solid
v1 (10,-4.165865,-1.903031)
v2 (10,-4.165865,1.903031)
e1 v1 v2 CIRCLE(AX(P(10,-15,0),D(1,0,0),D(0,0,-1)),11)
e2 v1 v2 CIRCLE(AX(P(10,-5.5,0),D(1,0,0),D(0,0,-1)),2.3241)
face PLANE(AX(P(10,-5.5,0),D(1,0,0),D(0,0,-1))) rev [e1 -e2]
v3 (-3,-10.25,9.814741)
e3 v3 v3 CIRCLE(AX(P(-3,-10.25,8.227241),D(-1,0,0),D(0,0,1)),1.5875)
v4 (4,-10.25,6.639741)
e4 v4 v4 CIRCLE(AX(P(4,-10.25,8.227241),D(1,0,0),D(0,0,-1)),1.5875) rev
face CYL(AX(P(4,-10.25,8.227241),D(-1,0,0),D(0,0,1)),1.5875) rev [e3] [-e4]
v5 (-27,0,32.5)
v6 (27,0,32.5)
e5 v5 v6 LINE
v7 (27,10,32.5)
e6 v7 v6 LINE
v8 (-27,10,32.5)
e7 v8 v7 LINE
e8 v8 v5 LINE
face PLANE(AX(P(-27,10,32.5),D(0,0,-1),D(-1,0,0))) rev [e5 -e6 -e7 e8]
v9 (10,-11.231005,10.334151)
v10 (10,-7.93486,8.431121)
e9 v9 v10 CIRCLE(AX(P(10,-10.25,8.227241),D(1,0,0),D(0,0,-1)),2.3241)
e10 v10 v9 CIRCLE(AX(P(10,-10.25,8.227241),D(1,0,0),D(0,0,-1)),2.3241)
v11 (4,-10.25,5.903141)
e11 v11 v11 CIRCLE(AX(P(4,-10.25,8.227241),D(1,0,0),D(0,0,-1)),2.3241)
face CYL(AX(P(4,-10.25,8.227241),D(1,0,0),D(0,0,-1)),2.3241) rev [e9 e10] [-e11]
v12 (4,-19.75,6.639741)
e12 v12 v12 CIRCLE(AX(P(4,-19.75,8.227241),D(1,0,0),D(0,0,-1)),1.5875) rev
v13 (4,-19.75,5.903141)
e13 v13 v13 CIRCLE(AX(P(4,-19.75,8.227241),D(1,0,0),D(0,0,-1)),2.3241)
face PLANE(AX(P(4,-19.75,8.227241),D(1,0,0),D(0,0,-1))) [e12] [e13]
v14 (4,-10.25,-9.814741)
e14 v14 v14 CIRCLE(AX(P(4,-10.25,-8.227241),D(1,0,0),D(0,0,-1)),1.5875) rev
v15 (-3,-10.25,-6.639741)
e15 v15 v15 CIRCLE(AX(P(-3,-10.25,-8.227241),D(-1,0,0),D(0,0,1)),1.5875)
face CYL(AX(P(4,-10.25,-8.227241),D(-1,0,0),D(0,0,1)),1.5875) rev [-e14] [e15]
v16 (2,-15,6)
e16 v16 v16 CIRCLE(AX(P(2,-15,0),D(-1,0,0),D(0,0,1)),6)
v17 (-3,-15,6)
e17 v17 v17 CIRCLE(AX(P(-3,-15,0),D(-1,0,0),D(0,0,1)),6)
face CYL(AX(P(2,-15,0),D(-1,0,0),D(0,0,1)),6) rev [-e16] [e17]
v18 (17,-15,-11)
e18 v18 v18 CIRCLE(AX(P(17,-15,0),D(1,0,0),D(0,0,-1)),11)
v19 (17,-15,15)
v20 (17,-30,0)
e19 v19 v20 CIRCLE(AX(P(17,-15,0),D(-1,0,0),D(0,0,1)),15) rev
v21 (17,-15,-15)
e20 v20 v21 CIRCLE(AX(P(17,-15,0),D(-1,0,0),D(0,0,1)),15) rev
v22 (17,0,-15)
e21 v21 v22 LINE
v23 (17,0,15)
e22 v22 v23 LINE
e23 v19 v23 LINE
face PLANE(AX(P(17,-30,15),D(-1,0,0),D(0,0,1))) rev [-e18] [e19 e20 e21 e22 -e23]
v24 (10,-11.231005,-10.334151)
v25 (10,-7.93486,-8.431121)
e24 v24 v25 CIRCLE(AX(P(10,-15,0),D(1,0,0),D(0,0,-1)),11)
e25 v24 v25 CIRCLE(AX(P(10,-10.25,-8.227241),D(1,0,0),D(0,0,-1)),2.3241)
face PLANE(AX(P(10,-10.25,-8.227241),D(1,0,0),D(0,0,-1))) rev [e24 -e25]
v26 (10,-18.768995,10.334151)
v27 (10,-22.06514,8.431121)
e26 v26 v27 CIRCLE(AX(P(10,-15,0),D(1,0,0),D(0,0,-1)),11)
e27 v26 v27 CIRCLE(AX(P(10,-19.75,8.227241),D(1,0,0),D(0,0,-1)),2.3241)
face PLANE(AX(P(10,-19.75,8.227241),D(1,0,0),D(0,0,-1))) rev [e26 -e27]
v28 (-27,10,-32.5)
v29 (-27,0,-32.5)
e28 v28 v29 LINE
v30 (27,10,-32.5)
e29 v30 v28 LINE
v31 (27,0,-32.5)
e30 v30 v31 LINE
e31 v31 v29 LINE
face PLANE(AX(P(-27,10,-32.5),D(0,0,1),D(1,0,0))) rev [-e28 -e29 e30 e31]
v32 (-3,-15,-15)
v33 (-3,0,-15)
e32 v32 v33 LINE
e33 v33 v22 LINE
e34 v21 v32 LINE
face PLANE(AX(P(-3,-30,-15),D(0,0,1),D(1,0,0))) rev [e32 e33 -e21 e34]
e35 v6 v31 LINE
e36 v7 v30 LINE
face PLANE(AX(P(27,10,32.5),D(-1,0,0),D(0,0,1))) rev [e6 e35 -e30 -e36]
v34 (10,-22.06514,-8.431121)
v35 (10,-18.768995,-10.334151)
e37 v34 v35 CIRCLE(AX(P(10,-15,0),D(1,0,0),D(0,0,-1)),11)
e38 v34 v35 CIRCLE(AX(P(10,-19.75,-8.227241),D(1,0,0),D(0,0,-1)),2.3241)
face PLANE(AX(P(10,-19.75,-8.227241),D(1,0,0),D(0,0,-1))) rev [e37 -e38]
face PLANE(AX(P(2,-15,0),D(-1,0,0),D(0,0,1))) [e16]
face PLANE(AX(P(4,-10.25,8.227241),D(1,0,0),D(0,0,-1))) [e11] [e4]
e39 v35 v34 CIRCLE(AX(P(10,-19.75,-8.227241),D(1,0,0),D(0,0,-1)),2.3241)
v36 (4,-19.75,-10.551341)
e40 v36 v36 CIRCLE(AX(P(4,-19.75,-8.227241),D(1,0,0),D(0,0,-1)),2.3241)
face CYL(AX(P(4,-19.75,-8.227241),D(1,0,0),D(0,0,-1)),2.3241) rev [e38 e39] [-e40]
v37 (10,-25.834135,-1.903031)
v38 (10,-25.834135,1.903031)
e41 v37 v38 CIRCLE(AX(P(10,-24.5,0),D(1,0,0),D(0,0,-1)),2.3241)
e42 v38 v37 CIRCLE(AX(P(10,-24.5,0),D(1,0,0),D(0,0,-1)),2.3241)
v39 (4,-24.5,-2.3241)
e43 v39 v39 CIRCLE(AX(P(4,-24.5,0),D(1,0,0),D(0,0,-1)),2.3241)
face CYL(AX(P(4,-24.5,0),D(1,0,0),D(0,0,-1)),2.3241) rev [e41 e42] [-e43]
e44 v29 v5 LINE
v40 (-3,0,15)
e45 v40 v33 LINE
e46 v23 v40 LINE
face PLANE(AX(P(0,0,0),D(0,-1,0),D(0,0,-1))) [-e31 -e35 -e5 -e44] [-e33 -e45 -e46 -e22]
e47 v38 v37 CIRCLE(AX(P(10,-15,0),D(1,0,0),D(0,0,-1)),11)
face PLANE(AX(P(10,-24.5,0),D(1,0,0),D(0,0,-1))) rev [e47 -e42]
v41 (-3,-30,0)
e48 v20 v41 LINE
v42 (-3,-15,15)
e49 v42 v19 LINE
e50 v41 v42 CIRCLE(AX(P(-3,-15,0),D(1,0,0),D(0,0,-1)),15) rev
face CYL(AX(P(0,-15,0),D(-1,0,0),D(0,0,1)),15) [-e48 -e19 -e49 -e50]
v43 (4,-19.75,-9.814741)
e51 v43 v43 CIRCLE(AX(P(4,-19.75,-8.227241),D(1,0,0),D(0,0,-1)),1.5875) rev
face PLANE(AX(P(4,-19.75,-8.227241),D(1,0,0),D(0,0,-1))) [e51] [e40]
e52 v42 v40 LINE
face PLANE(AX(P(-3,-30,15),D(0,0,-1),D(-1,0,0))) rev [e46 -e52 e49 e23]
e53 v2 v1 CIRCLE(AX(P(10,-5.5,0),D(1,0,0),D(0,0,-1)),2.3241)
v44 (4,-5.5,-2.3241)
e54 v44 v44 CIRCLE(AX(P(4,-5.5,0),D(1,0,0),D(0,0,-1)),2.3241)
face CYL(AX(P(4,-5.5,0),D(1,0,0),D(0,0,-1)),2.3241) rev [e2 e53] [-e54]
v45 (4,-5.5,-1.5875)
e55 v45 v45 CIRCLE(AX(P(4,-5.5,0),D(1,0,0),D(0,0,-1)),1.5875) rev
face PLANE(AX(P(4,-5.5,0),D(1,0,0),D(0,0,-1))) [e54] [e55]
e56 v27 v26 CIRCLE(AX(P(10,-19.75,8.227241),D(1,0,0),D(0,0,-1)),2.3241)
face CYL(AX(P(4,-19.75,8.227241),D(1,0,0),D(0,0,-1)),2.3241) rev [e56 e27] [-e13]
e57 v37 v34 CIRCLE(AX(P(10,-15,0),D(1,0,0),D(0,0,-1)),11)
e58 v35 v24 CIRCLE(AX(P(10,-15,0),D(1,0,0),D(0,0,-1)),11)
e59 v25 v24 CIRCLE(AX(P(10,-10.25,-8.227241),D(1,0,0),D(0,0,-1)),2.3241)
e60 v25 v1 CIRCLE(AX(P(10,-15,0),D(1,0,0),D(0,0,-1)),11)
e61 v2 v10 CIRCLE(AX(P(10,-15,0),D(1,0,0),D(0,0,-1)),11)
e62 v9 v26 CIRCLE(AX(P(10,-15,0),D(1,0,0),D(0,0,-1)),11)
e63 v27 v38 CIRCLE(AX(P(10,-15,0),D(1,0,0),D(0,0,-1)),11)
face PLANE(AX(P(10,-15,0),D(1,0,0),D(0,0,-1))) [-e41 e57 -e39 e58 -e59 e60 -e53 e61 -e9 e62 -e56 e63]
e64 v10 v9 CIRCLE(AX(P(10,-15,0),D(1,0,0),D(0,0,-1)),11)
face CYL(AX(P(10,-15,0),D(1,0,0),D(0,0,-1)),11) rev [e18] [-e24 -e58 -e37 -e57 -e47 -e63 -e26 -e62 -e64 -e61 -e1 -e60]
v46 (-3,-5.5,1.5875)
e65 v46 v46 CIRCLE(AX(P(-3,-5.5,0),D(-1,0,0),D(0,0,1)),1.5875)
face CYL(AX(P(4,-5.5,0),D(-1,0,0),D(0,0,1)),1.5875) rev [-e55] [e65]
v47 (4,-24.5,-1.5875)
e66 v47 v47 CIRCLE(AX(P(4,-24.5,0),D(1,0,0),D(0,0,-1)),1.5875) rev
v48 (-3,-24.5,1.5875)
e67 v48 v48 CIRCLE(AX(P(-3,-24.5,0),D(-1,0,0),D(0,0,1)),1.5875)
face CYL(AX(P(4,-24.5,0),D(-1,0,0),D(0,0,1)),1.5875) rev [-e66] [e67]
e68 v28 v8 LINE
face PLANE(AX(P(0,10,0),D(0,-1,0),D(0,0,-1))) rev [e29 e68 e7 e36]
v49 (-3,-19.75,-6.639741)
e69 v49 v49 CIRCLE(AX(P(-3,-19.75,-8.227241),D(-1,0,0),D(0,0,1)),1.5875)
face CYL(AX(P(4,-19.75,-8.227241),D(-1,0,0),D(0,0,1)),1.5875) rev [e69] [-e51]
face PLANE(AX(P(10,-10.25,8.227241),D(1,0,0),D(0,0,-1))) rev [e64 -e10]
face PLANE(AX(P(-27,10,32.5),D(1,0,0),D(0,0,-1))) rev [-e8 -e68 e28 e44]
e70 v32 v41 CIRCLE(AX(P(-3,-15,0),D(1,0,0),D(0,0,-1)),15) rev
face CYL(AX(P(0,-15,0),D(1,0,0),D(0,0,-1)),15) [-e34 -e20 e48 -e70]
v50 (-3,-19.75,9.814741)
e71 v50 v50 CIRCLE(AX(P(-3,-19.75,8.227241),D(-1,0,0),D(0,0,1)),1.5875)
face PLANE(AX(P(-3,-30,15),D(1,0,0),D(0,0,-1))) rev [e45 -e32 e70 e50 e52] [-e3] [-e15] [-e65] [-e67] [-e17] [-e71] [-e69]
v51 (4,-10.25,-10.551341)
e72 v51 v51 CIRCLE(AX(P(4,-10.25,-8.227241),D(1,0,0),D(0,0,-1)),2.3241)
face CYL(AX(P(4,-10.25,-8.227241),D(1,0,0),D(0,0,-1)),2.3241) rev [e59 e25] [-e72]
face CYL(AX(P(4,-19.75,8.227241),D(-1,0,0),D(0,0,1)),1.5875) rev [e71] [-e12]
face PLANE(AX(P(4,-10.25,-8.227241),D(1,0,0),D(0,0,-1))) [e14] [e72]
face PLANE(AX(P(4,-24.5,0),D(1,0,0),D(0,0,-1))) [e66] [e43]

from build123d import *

# Parameters (mm, degrees)
SKETCH1_W           = 54
SKETCH1_H           = 65
BOSS_EXTRUDE1_DEPTH = 10
SKETCH2_W           = 20
SKETCH2_H           = 30
BOSS_EXTRUDE2_DEPTH = 30
FILLET1_R           = 15
SKETCH3_R           = 11
CUT_EXTRUDE1_DEPTH  = 7
SKETCH4_R           = 6
CUT_EXTRUDE2_DEPTH  = 5
SKETCH5_R           = 1.5875
CUT_EXTRUDE3_DEPTH  = 7
SKETCH6_R           = 2.3241
CUT_EXTRUDE4_DEPTH  = 6


with BuildPart() as part:
    # Sketch1 → Boss-Extrude1 (new body)
    with BuildSketch(Plane(origin=(0, 0, 0), x_dir=(1, 0, 0), z_dir=(0, 1, 0))):
        Rectangle(SKETCH1_W, SKETCH1_H)
    extrude(amount=BOSS_EXTRUDE1_DEPTH)

    # Sketch2 → Boss-Extrude2 (add)
    with BuildSketch(Plane.XZ):
        with Locations((7, 0)):
            Rectangle(SKETCH2_W, SKETCH2_H)
    extrude(amount=BOSS_EXTRUDE2_DEPTH)

    # Fillet1
    fillet1_edges = [part.edges().sort_by_distance(p)[0] for p in [
        (7, -30, -15),
        (7, -30, 15),
    ]]
    fillet(fillet1_edges, radius=FILLET1_R - 0.0001)  # a hair under: the kernel refuses the full size

    # Sketch3 → Cut-Extrude1 (cut)
    with BuildSketch(Plane(origin=(17, 0, 0), x_dir=(0, 0, -1), z_dir=(1, 0, 0))):
        with Locations((0, -15)):
            Circle(SKETCH3_R)
    extrude(amount=-CUT_EXTRUDE1_DEPTH, mode=Mode.SUBTRACT)

    # Sketch4 → Cut-Extrude2 (cut)
    with BuildSketch(Plane.ZY.offset(3)):
        with Locations((0, -15)):
            Circle(SKETCH4_R)
    extrude(amount=-CUT_EXTRUDE2_DEPTH, mode=Mode.SUBTRACT)

    # Sketch5 → Cut-Extrude3 (cut)
    with BuildSketch(Plane.ZY.offset(3)):
        with Locations((0, -5.5)):
            Circle(SKETCH5_R)
        with Locations((8.227241336, -10.25)):
            Circle(SKETCH5_R)
        with Locations((8.227241336, -19.75)):
            Circle(SKETCH5_R)
        with Locations((0, -24.5)):
            Circle(SKETCH5_R)
        with Locations((-8.227241336, -19.75)):
            Circle(SKETCH5_R)
        with Locations((-8.227241336, -10.25)):
            Circle(SKETCH5_R)
    extrude(amount=-CUT_EXTRUDE3_DEPTH, mode=Mode.SUBTRACT)

    # Sketch6 → Cut-Extrude4 (cut)
    with BuildSketch(Plane(origin=(10, 0, 0), x_dir=(0, 0, -1), z_dir=(1, 0, 0))):
        with Locations((0, -5.5)):
            Circle(SKETCH6_R)
        with Locations((8.227241336, -10.25)):
            Circle(SKETCH6_R)
        with Locations((8.227241336, -19.75)):
            Circle(SKETCH6_R)
        with Locations((0, -24.5)):
            Circle(SKETCH6_R)
        with Locations((-8.227241336, -19.75)):
            Circle(SKETCH6_R)
        with Locations((-8.227241336, -10.25)):
            Circle(SKETCH6_R)
    extrude(amount=-CUT_EXTRUDE4_DEPTH, mode=Mode.SUBTRACT)


solid = part.part
